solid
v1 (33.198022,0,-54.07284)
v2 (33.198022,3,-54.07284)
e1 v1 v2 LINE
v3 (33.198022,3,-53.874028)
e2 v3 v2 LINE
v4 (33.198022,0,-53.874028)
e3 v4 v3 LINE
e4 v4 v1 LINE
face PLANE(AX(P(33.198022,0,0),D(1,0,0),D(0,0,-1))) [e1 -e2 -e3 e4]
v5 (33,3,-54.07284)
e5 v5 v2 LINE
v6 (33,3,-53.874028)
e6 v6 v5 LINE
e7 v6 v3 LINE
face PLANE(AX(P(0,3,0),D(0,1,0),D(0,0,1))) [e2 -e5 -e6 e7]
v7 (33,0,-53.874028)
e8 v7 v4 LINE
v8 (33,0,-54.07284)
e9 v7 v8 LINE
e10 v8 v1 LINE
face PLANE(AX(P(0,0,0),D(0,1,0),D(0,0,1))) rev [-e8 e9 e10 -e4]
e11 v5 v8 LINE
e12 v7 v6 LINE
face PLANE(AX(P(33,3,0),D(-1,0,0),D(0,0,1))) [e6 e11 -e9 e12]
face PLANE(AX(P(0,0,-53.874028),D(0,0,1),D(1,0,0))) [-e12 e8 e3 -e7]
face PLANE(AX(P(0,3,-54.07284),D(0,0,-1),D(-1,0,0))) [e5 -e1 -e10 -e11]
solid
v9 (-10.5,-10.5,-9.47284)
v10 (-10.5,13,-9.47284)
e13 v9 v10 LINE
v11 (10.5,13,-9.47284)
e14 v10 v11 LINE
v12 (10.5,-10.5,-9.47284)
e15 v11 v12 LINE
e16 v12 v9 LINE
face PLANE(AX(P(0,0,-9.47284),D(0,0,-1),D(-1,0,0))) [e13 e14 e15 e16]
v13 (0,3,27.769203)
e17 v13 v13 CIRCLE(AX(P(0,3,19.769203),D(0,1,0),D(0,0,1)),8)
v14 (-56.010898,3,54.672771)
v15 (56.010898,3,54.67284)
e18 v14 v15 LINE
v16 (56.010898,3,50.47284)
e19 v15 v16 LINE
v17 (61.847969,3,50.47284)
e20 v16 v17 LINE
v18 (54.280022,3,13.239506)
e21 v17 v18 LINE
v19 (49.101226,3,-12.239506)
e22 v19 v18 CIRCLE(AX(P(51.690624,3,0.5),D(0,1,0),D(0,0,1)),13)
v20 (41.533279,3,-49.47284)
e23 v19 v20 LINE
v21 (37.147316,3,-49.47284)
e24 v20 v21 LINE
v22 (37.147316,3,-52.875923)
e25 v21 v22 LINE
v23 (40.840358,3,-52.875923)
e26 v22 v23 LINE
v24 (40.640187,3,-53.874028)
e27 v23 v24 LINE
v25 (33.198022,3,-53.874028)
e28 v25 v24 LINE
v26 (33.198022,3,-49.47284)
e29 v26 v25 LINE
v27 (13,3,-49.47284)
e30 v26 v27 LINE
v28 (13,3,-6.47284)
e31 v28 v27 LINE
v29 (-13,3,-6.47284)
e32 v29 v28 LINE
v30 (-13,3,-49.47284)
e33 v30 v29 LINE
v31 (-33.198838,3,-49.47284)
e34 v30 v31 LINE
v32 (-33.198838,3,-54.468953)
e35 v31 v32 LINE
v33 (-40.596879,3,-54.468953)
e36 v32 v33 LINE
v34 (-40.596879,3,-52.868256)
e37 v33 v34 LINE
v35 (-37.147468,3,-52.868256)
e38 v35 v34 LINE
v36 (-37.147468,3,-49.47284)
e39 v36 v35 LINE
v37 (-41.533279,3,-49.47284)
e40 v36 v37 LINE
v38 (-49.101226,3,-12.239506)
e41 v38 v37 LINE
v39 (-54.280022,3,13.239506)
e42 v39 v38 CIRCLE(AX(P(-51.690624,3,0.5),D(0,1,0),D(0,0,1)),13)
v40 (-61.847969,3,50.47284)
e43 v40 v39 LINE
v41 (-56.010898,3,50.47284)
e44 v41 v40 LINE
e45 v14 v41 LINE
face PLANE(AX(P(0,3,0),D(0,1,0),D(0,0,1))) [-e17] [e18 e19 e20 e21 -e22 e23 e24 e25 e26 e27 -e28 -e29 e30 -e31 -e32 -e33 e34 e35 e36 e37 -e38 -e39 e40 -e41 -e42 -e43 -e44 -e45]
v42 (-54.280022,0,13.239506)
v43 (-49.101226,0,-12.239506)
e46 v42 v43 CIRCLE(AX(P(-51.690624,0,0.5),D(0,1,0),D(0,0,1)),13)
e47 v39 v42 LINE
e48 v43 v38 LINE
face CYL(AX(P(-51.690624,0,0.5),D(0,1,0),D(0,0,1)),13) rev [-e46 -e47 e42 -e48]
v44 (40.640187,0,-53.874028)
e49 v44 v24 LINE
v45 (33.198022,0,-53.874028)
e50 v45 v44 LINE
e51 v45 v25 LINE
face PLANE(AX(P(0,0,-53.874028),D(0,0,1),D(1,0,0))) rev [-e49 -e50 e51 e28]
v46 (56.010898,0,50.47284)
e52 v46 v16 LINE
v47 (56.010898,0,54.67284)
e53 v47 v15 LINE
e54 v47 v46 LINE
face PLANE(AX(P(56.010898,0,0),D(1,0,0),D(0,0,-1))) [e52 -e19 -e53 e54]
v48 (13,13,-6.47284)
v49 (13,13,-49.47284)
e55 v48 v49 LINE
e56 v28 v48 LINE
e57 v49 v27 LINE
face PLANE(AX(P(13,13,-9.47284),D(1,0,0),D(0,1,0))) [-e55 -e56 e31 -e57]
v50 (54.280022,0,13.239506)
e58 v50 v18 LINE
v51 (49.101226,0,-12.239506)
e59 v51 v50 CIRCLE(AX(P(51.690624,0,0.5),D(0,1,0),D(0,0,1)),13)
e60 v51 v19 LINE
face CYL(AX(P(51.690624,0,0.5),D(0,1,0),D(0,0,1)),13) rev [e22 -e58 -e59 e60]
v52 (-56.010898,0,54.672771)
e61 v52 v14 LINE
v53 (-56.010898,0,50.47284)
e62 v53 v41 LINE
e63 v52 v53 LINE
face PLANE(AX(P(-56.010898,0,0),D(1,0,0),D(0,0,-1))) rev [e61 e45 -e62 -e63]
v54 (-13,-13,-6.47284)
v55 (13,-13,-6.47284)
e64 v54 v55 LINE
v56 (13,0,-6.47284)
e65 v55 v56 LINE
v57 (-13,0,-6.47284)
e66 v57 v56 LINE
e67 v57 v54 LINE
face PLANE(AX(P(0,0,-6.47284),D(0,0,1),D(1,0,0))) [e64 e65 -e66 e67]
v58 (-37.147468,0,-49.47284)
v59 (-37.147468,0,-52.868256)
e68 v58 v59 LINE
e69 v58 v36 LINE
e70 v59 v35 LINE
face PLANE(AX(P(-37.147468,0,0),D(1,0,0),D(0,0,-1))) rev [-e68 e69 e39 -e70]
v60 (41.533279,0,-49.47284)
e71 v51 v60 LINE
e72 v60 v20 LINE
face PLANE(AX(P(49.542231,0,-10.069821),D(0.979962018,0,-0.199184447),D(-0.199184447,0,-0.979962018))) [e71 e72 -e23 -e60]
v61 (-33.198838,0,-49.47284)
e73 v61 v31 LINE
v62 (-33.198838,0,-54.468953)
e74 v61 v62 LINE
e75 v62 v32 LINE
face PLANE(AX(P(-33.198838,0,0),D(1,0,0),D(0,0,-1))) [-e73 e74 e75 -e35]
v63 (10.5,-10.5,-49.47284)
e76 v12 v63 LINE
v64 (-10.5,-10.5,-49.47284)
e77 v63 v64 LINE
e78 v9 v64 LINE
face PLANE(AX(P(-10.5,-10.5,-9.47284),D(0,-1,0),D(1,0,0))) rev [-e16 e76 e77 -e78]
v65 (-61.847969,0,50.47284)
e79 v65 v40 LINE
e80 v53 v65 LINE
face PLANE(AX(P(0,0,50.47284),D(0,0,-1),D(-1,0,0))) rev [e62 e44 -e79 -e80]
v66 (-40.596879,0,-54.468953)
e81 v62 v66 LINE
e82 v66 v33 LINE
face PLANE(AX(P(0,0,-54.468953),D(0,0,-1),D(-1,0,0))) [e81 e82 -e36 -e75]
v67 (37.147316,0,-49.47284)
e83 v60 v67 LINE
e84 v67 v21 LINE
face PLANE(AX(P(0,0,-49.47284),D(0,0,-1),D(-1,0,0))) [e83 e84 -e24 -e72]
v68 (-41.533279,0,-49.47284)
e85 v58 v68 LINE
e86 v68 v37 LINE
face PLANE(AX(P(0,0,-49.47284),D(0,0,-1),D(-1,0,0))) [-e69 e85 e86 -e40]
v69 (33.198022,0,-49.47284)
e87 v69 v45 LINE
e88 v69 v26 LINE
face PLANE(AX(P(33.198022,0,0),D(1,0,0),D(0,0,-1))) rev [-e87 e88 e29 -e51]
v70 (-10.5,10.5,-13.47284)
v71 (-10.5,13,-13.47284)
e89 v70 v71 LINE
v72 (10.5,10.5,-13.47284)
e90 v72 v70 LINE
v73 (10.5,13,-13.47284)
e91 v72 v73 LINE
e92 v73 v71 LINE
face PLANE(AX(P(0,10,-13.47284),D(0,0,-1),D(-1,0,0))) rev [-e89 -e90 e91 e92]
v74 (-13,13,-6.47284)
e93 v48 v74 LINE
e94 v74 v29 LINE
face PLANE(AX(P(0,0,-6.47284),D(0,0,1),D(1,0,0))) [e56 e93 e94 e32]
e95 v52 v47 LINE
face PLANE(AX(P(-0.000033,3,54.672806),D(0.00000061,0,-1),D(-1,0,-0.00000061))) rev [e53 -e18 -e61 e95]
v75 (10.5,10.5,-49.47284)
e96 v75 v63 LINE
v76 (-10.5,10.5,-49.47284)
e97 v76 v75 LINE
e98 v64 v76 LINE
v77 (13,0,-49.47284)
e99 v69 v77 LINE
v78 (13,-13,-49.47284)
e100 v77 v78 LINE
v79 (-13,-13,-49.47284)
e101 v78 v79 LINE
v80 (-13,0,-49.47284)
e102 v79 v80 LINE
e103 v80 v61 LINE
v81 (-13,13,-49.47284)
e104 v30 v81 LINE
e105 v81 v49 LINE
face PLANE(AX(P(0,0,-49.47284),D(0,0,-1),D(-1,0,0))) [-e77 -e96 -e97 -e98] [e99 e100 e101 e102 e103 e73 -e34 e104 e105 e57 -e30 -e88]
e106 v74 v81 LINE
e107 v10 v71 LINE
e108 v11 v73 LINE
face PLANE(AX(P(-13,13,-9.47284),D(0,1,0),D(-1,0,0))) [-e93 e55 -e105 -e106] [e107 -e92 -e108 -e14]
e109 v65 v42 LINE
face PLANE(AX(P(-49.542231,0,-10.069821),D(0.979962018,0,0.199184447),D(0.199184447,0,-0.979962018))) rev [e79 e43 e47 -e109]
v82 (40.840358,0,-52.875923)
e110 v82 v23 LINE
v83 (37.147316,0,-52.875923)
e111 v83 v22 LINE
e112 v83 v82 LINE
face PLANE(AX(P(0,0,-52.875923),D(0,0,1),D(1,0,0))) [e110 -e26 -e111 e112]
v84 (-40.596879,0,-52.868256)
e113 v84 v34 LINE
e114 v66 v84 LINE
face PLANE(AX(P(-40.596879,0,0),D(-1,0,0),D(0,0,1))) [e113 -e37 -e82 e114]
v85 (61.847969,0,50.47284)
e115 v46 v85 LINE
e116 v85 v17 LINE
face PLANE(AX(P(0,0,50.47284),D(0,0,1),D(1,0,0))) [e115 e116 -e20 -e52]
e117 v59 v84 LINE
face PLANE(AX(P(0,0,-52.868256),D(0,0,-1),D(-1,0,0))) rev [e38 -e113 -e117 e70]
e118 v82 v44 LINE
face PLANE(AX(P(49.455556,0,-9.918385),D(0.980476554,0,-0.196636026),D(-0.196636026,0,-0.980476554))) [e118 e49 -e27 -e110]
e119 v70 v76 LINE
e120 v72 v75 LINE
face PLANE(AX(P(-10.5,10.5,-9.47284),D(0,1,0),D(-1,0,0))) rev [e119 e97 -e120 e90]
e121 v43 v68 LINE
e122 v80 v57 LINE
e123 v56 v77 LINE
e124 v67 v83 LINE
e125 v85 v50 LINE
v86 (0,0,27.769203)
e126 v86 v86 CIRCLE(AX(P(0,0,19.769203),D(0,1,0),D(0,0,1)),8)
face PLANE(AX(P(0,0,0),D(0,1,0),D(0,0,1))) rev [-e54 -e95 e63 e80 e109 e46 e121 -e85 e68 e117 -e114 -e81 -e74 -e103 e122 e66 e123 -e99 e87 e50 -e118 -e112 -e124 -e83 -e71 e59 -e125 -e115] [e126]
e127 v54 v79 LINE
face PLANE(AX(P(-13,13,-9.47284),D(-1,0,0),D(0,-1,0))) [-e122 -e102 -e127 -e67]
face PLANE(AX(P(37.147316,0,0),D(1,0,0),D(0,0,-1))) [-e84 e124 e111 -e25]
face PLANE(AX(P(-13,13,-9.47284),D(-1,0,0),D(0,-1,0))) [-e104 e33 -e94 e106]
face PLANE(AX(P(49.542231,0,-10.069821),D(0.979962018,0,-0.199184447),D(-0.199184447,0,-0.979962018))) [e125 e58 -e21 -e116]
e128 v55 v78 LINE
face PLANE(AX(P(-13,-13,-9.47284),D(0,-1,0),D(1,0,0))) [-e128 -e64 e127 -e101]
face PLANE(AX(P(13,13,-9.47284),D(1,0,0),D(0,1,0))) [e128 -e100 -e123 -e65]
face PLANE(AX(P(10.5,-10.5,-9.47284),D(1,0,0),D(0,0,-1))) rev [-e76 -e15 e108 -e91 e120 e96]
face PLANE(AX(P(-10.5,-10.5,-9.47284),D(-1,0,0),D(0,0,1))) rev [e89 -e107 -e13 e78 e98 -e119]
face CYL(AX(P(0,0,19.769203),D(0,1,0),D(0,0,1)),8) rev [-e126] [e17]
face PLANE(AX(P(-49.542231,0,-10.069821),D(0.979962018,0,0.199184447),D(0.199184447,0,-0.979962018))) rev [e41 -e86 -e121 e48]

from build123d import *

# Parameters (mm, degrees)
SALIENTE_EXTRUIR2_DEPTH = 3
CROQUIS3_W              = 0.20141636
CROQUIS3_H              = 0.203887222
CROQUIS3_W_2            = 7.398041038
CROQUIS3_W_3            = 0.198837733
CROQUIS3_W_4            = 66
CROQUIS3_H_2            = 0.2
CORTAR_EXTRUIR1_DEPTH   = 83.783550537
CROQUIS4_R              = 13
CORTAR_EXTRUIR3_DEPTH   = 83.603212434
CROQUIS5_R              = 8
CORTAR_EXTRUIR4_DEPTH   = 83.603212434
CROQUIS6_W              = 26
CROQUIS6_H              = 26
CROQUIS6_W_2            = 21
CROQUIS6_H_2            = 21
SALIENTE_EXTRUIR5_DEPTH = 40
CROQUIS11_W             = 21
CROQUIS11_H             = 3
CORTAR_EXTRUIR7_DEPTH   = 40
CROQUIS12_W             = 26
CROQUIS12_H             = 26
SALIENTE_EXTRUIR6_DEPTH = 3
CROQUIS13_W             = 21
CROQUIS13_H             = 4
CORTAR_EXTRUIR8_DEPTH   = 3


# Read off the part's stored shape, not the designer's step: Saliente-Extruir2
with BuildPart() as part:
    # Saliente-Extruir2 outline → Saliente-Extruir2 (new body)
    with BuildSketch(Plane(origin=(0, 0, 0), x_dir=(1, 0, 0), z_dir=(0, 1, 0))):
        Polygon((41.692627312, 49.672839919), (37.346313656, 49.672839919), (37.346313656, 52.672839919), (41.08285537, 52.672839919), (40.798295131, 54.072839919), (33, 54.072839919), (33, 49.672839919), (-33, 49.672839919), (-33, 54.672839919), (-40.798295131, 54.672839919), (-40.798295131, 54.072839919), (-41.08285537, 52.672839919), (-37.346313656, 52.672839919), (-37.342667374, 49.672839919), (-41.692627312, 49.672839919), (-62.088620654, -50.672839919), (-56.210898261, -50.672839919), (-56.210898261, -54.672771312), (56.210898265, -54.672839919), (56.210898265, -50.672839919), (62.088620654, -50.672839919), align=None)
    extrude(amount=SALIENTE_EXTRUIR2_DEPTH)

    # Croquis3 → Cortar-Extruir1 (cut, through all)
    with BuildSketch(Plane(origin=(0, 3, 0), x_dir=(1, 0, 0), z_dir=(0, 1, 0))):
        Polygon((-41.533278775, 49.472839919), (-41.733278775, 49.472839919), (-62.047969191, -50.472839919), (-61.847969191, -50.472839919), align=None)
        Polygon((-61.847969191, -50.472839919), (-62.047969191, -50.472839919), (-62.088620654, -50.672839919), (-61.888620654, -50.672839919), align=None)
        Polygon((-56.010898261, -50.472839919), (-61.847969191, -50.472839919), (-61.888620654, -50.672839919), (-56.210898261, -50.672839919), (-56.210898261, -54.672771312), (-56.010898261, -54.672771434), (-56.010898261, -50.672839919), align=None)
        Polygon((-41.492627312, 49.672839919), (-41.692627312, 49.672839919), (-41.733278775, 49.472839919), (-41.533278775, 49.472839919), align=None)
        Polygon((-37.342667374, 49.672839919), (-41.492627312, 49.672839919), (-41.533278775, 49.472839919), (-37.342667374, 49.472839919), align=None)
        Polygon((-37.346313656, 52.672839919), (-37.342667374, 49.672839919), (-37.342667374, 49.472839919), (-37.147468141, 49.472839919), (-37.147468141, 52.868255538), (-40.596878771, 52.868255538), (-40.596878771, 52.672839919), align=None)
        Polygon((-41.08285537, 52.672839919), (-40.596878771, 52.672839919), (-40.596878771, 52.868255538), (-41.043135716, 52.868255538), align=None)
        Polygon((-41.043135716, 52.868255538), (-40.596878771, 52.868255538), (-40.596878771, 54.468952697), (-40.798295131, 54.468952697), (-40.798295131, 54.072839919), align=None)
        with Locations((-40.697586951, 54.570896308)):
            Rectangle(CROQUIS3_W, CROQUIS3_H)
        with Locations((-36.897858252, 54.570896308)):
            Rectangle(CROQUIS3_W_2, CROQUIS3_H)
        with Locations((-33.099418867, 54.570896308)):
            Rectangle(CROQUIS3_W_3, CROQUIS3_H)
        Polygon((-33, 54.468952697), (-33.198837733, 54.468952697), (-33.198837733, 49.472839919), (-33, 49.472839919), (-33, 49.672839919), align=None)
        with Locations((0, 49.572839919)):
            Rectangle(CROQUIS3_W_4, CROQUIS3_H_2)
        Polygon((33, 53.87402838), (33, 49.672839919), (33, 49.472839919), (33.198022075, 49.472839919), (33.198022075, 53.87402838), align=None)
        Polygon((37.147315766, 49.472839919), (37.346313656, 49.472839919), (37.346313656, 49.672839919), (37.346313656, 52.672839919), (37.346313656, 52.875922627), (37.147315766, 52.875922627), align=None)
        Polygon((40.881086684, 52.672839919), (40.840358146, 52.875922627), (37.346313656, 52.875922627), (37.346313656, 52.672839919), align=None)
        Polygon((33.198022075, 54.072839919), (33.198022075, 53.87402838), (40.640186558, 53.87402838), (40.60031461, 54.072839919), align=None)
        Polygon((40.83870503, 53.87402838), (40.640186558, 53.87402838), (40.840358146, 52.875922627), (41.041577324, 52.875922627), align=None)
        Polygon((41.041577324, 52.875922627), (40.840358146, 52.875922627), (40.881086684, 52.672839919), (41.08285537, 52.672839919), align=None)
        Polygon((40.60031461, 54.072839919), (40.640186558, 53.87402838), (40.83870503, 53.87402838), (40.798295131, 54.072839919), align=None)
        Polygon((37.346313656, 49.472839919), (41.533278775, 49.472839919), (41.492627312, 49.672839919), (37.346313656, 49.672839919), align=None)
        Polygon((41.492627312, 49.672839919), (41.533278775, 49.472839919), (41.733278775, 49.472839919), (41.692627312, 49.672839919), align=None)
        Polygon((41.533278775, 49.472839919), (61.847969191, -50.472839919), (62.047969191, -50.472839919), (41.733278775, 49.472839919), align=None)
        Polygon((56.210898265, -50.472839919), (56.210898265, -50.672839919), (61.888620654, -50.672839919), (61.847969191, -50.472839919), align=None)
        Polygon((61.847969191, -50.472839919), (61.888620654, -50.672839919), (62.088620654, -50.672839919), (62.047969191, -50.472839919), align=None)
        Polygon((56.010898265, -50.672839919), (56.010898265, -54.672839797), (56.210898265, -54.672839919), (56.210898265, -50.672839919), (56.210898265, -50.472839919), (56.010898265, -50.472839919), align=None)
    extrude(amount=-CORTAR_EXTRUIR1_DEPTH, mode=Mode.SUBTRACT)


with BuildPart() as cortar_extruir1_piece_1:
    # of the separate pieces the step leaves, piece 1, a body of its own (cortar_extruir1_pieces)
    add(part.part.solids().sort_by_distance((-56.010898261, 0, 54.672771434))[0])

    # Croquis4 → Cortar-Extruir3 (cut, through all)
    with BuildSketch(Plane(origin=(0, 3, 0), x_dir=(1, 0, 0), z_dir=(0, 1, 0))):
        with Locations((-51.690623983, -0.5)):
            Circle(CROQUIS4_R)
        with Locations((51.690623983, -0.5)):
            Circle(CROQUIS4_R)
    extrude(amount=-CORTAR_EXTRUIR3_DEPTH, mode=Mode.SUBTRACT)

    # Croquis5 → Cortar-Extruir4 (cut, through all)
    with BuildSketch(Plane(origin=(0, 3, 0), x_dir=(1, 0, 0), z_dir=(0, 1, 0))):
        with Locations(Location((0, -19.769203208, 0), (0, 0, 270))):
            Circle(CROQUIS5_R)
    extrude(amount=-CORTAR_EXTRUIR4_DEPTH, mode=Mode.SUBTRACT)

    # Croquis6 → Saliente-Extruir5 (add)
    with BuildSketch(Plane(origin=(0, 0, -49.472839919), x_dir=(-1, 0, 0), z_dir=(0, 0, -1))):
        Rectangle(CROQUIS6_W, CROQUIS6_H)
        Rectangle(CROQUIS6_W_2, CROQUIS6_H_2, mode=Mode.SUBTRACT)
    extrude(amount=-SALIENTE_EXTRUIR5_DEPTH)

    # Croquis11 → Cortar-Extruir7 (cut)
    with BuildSketch(Plane(origin=(0, 0, -49.472839919), x_dir=(-1, 0, 0), z_dir=(0, 0, -1))):
        with Locations((0, 1.5)):
            Rectangle(CROQUIS11_W, CROQUIS11_H)
    extrude(amount=-CORTAR_EXTRUIR7_DEPTH, mode=Mode.SUBTRACT)

    # Croquis12 → Saliente-Extruir6 (add)
    with BuildSketch(Plane.XY.offset(-9.472839919)):
        Rectangle(CROQUIS12_W, CROQUIS12_H)
    extrude(amount=SALIENTE_EXTRUIR6_DEPTH)

    # Croquis13 → Cortar-Extruir8 (cut)
    with BuildSketch(Plane(origin=(0, 13, 0), x_dir=(1, 0, 0), z_dir=(0, 1, 0))):
        with Locations((0, 11.472839919)):
            Rectangle(CROQUIS13_W, CROQUIS13_H)
    extrude(amount=-CORTAR_EXTRUIR8_DEPTH, mode=Mode.SUBTRACT)


with BuildPart() as cortar_extruir1_piece_2:
    # of the separate pieces the step leaves, piece 2, a body of its own (cortar_extruir1_pieces)
    add(part.part.solids().sort_by_distance((33.198022075, 0, -54.072839919))[0])


solid = Compound([cortar_extruir1_piece_1.part, cortar_extruir1_piece_2.part])
